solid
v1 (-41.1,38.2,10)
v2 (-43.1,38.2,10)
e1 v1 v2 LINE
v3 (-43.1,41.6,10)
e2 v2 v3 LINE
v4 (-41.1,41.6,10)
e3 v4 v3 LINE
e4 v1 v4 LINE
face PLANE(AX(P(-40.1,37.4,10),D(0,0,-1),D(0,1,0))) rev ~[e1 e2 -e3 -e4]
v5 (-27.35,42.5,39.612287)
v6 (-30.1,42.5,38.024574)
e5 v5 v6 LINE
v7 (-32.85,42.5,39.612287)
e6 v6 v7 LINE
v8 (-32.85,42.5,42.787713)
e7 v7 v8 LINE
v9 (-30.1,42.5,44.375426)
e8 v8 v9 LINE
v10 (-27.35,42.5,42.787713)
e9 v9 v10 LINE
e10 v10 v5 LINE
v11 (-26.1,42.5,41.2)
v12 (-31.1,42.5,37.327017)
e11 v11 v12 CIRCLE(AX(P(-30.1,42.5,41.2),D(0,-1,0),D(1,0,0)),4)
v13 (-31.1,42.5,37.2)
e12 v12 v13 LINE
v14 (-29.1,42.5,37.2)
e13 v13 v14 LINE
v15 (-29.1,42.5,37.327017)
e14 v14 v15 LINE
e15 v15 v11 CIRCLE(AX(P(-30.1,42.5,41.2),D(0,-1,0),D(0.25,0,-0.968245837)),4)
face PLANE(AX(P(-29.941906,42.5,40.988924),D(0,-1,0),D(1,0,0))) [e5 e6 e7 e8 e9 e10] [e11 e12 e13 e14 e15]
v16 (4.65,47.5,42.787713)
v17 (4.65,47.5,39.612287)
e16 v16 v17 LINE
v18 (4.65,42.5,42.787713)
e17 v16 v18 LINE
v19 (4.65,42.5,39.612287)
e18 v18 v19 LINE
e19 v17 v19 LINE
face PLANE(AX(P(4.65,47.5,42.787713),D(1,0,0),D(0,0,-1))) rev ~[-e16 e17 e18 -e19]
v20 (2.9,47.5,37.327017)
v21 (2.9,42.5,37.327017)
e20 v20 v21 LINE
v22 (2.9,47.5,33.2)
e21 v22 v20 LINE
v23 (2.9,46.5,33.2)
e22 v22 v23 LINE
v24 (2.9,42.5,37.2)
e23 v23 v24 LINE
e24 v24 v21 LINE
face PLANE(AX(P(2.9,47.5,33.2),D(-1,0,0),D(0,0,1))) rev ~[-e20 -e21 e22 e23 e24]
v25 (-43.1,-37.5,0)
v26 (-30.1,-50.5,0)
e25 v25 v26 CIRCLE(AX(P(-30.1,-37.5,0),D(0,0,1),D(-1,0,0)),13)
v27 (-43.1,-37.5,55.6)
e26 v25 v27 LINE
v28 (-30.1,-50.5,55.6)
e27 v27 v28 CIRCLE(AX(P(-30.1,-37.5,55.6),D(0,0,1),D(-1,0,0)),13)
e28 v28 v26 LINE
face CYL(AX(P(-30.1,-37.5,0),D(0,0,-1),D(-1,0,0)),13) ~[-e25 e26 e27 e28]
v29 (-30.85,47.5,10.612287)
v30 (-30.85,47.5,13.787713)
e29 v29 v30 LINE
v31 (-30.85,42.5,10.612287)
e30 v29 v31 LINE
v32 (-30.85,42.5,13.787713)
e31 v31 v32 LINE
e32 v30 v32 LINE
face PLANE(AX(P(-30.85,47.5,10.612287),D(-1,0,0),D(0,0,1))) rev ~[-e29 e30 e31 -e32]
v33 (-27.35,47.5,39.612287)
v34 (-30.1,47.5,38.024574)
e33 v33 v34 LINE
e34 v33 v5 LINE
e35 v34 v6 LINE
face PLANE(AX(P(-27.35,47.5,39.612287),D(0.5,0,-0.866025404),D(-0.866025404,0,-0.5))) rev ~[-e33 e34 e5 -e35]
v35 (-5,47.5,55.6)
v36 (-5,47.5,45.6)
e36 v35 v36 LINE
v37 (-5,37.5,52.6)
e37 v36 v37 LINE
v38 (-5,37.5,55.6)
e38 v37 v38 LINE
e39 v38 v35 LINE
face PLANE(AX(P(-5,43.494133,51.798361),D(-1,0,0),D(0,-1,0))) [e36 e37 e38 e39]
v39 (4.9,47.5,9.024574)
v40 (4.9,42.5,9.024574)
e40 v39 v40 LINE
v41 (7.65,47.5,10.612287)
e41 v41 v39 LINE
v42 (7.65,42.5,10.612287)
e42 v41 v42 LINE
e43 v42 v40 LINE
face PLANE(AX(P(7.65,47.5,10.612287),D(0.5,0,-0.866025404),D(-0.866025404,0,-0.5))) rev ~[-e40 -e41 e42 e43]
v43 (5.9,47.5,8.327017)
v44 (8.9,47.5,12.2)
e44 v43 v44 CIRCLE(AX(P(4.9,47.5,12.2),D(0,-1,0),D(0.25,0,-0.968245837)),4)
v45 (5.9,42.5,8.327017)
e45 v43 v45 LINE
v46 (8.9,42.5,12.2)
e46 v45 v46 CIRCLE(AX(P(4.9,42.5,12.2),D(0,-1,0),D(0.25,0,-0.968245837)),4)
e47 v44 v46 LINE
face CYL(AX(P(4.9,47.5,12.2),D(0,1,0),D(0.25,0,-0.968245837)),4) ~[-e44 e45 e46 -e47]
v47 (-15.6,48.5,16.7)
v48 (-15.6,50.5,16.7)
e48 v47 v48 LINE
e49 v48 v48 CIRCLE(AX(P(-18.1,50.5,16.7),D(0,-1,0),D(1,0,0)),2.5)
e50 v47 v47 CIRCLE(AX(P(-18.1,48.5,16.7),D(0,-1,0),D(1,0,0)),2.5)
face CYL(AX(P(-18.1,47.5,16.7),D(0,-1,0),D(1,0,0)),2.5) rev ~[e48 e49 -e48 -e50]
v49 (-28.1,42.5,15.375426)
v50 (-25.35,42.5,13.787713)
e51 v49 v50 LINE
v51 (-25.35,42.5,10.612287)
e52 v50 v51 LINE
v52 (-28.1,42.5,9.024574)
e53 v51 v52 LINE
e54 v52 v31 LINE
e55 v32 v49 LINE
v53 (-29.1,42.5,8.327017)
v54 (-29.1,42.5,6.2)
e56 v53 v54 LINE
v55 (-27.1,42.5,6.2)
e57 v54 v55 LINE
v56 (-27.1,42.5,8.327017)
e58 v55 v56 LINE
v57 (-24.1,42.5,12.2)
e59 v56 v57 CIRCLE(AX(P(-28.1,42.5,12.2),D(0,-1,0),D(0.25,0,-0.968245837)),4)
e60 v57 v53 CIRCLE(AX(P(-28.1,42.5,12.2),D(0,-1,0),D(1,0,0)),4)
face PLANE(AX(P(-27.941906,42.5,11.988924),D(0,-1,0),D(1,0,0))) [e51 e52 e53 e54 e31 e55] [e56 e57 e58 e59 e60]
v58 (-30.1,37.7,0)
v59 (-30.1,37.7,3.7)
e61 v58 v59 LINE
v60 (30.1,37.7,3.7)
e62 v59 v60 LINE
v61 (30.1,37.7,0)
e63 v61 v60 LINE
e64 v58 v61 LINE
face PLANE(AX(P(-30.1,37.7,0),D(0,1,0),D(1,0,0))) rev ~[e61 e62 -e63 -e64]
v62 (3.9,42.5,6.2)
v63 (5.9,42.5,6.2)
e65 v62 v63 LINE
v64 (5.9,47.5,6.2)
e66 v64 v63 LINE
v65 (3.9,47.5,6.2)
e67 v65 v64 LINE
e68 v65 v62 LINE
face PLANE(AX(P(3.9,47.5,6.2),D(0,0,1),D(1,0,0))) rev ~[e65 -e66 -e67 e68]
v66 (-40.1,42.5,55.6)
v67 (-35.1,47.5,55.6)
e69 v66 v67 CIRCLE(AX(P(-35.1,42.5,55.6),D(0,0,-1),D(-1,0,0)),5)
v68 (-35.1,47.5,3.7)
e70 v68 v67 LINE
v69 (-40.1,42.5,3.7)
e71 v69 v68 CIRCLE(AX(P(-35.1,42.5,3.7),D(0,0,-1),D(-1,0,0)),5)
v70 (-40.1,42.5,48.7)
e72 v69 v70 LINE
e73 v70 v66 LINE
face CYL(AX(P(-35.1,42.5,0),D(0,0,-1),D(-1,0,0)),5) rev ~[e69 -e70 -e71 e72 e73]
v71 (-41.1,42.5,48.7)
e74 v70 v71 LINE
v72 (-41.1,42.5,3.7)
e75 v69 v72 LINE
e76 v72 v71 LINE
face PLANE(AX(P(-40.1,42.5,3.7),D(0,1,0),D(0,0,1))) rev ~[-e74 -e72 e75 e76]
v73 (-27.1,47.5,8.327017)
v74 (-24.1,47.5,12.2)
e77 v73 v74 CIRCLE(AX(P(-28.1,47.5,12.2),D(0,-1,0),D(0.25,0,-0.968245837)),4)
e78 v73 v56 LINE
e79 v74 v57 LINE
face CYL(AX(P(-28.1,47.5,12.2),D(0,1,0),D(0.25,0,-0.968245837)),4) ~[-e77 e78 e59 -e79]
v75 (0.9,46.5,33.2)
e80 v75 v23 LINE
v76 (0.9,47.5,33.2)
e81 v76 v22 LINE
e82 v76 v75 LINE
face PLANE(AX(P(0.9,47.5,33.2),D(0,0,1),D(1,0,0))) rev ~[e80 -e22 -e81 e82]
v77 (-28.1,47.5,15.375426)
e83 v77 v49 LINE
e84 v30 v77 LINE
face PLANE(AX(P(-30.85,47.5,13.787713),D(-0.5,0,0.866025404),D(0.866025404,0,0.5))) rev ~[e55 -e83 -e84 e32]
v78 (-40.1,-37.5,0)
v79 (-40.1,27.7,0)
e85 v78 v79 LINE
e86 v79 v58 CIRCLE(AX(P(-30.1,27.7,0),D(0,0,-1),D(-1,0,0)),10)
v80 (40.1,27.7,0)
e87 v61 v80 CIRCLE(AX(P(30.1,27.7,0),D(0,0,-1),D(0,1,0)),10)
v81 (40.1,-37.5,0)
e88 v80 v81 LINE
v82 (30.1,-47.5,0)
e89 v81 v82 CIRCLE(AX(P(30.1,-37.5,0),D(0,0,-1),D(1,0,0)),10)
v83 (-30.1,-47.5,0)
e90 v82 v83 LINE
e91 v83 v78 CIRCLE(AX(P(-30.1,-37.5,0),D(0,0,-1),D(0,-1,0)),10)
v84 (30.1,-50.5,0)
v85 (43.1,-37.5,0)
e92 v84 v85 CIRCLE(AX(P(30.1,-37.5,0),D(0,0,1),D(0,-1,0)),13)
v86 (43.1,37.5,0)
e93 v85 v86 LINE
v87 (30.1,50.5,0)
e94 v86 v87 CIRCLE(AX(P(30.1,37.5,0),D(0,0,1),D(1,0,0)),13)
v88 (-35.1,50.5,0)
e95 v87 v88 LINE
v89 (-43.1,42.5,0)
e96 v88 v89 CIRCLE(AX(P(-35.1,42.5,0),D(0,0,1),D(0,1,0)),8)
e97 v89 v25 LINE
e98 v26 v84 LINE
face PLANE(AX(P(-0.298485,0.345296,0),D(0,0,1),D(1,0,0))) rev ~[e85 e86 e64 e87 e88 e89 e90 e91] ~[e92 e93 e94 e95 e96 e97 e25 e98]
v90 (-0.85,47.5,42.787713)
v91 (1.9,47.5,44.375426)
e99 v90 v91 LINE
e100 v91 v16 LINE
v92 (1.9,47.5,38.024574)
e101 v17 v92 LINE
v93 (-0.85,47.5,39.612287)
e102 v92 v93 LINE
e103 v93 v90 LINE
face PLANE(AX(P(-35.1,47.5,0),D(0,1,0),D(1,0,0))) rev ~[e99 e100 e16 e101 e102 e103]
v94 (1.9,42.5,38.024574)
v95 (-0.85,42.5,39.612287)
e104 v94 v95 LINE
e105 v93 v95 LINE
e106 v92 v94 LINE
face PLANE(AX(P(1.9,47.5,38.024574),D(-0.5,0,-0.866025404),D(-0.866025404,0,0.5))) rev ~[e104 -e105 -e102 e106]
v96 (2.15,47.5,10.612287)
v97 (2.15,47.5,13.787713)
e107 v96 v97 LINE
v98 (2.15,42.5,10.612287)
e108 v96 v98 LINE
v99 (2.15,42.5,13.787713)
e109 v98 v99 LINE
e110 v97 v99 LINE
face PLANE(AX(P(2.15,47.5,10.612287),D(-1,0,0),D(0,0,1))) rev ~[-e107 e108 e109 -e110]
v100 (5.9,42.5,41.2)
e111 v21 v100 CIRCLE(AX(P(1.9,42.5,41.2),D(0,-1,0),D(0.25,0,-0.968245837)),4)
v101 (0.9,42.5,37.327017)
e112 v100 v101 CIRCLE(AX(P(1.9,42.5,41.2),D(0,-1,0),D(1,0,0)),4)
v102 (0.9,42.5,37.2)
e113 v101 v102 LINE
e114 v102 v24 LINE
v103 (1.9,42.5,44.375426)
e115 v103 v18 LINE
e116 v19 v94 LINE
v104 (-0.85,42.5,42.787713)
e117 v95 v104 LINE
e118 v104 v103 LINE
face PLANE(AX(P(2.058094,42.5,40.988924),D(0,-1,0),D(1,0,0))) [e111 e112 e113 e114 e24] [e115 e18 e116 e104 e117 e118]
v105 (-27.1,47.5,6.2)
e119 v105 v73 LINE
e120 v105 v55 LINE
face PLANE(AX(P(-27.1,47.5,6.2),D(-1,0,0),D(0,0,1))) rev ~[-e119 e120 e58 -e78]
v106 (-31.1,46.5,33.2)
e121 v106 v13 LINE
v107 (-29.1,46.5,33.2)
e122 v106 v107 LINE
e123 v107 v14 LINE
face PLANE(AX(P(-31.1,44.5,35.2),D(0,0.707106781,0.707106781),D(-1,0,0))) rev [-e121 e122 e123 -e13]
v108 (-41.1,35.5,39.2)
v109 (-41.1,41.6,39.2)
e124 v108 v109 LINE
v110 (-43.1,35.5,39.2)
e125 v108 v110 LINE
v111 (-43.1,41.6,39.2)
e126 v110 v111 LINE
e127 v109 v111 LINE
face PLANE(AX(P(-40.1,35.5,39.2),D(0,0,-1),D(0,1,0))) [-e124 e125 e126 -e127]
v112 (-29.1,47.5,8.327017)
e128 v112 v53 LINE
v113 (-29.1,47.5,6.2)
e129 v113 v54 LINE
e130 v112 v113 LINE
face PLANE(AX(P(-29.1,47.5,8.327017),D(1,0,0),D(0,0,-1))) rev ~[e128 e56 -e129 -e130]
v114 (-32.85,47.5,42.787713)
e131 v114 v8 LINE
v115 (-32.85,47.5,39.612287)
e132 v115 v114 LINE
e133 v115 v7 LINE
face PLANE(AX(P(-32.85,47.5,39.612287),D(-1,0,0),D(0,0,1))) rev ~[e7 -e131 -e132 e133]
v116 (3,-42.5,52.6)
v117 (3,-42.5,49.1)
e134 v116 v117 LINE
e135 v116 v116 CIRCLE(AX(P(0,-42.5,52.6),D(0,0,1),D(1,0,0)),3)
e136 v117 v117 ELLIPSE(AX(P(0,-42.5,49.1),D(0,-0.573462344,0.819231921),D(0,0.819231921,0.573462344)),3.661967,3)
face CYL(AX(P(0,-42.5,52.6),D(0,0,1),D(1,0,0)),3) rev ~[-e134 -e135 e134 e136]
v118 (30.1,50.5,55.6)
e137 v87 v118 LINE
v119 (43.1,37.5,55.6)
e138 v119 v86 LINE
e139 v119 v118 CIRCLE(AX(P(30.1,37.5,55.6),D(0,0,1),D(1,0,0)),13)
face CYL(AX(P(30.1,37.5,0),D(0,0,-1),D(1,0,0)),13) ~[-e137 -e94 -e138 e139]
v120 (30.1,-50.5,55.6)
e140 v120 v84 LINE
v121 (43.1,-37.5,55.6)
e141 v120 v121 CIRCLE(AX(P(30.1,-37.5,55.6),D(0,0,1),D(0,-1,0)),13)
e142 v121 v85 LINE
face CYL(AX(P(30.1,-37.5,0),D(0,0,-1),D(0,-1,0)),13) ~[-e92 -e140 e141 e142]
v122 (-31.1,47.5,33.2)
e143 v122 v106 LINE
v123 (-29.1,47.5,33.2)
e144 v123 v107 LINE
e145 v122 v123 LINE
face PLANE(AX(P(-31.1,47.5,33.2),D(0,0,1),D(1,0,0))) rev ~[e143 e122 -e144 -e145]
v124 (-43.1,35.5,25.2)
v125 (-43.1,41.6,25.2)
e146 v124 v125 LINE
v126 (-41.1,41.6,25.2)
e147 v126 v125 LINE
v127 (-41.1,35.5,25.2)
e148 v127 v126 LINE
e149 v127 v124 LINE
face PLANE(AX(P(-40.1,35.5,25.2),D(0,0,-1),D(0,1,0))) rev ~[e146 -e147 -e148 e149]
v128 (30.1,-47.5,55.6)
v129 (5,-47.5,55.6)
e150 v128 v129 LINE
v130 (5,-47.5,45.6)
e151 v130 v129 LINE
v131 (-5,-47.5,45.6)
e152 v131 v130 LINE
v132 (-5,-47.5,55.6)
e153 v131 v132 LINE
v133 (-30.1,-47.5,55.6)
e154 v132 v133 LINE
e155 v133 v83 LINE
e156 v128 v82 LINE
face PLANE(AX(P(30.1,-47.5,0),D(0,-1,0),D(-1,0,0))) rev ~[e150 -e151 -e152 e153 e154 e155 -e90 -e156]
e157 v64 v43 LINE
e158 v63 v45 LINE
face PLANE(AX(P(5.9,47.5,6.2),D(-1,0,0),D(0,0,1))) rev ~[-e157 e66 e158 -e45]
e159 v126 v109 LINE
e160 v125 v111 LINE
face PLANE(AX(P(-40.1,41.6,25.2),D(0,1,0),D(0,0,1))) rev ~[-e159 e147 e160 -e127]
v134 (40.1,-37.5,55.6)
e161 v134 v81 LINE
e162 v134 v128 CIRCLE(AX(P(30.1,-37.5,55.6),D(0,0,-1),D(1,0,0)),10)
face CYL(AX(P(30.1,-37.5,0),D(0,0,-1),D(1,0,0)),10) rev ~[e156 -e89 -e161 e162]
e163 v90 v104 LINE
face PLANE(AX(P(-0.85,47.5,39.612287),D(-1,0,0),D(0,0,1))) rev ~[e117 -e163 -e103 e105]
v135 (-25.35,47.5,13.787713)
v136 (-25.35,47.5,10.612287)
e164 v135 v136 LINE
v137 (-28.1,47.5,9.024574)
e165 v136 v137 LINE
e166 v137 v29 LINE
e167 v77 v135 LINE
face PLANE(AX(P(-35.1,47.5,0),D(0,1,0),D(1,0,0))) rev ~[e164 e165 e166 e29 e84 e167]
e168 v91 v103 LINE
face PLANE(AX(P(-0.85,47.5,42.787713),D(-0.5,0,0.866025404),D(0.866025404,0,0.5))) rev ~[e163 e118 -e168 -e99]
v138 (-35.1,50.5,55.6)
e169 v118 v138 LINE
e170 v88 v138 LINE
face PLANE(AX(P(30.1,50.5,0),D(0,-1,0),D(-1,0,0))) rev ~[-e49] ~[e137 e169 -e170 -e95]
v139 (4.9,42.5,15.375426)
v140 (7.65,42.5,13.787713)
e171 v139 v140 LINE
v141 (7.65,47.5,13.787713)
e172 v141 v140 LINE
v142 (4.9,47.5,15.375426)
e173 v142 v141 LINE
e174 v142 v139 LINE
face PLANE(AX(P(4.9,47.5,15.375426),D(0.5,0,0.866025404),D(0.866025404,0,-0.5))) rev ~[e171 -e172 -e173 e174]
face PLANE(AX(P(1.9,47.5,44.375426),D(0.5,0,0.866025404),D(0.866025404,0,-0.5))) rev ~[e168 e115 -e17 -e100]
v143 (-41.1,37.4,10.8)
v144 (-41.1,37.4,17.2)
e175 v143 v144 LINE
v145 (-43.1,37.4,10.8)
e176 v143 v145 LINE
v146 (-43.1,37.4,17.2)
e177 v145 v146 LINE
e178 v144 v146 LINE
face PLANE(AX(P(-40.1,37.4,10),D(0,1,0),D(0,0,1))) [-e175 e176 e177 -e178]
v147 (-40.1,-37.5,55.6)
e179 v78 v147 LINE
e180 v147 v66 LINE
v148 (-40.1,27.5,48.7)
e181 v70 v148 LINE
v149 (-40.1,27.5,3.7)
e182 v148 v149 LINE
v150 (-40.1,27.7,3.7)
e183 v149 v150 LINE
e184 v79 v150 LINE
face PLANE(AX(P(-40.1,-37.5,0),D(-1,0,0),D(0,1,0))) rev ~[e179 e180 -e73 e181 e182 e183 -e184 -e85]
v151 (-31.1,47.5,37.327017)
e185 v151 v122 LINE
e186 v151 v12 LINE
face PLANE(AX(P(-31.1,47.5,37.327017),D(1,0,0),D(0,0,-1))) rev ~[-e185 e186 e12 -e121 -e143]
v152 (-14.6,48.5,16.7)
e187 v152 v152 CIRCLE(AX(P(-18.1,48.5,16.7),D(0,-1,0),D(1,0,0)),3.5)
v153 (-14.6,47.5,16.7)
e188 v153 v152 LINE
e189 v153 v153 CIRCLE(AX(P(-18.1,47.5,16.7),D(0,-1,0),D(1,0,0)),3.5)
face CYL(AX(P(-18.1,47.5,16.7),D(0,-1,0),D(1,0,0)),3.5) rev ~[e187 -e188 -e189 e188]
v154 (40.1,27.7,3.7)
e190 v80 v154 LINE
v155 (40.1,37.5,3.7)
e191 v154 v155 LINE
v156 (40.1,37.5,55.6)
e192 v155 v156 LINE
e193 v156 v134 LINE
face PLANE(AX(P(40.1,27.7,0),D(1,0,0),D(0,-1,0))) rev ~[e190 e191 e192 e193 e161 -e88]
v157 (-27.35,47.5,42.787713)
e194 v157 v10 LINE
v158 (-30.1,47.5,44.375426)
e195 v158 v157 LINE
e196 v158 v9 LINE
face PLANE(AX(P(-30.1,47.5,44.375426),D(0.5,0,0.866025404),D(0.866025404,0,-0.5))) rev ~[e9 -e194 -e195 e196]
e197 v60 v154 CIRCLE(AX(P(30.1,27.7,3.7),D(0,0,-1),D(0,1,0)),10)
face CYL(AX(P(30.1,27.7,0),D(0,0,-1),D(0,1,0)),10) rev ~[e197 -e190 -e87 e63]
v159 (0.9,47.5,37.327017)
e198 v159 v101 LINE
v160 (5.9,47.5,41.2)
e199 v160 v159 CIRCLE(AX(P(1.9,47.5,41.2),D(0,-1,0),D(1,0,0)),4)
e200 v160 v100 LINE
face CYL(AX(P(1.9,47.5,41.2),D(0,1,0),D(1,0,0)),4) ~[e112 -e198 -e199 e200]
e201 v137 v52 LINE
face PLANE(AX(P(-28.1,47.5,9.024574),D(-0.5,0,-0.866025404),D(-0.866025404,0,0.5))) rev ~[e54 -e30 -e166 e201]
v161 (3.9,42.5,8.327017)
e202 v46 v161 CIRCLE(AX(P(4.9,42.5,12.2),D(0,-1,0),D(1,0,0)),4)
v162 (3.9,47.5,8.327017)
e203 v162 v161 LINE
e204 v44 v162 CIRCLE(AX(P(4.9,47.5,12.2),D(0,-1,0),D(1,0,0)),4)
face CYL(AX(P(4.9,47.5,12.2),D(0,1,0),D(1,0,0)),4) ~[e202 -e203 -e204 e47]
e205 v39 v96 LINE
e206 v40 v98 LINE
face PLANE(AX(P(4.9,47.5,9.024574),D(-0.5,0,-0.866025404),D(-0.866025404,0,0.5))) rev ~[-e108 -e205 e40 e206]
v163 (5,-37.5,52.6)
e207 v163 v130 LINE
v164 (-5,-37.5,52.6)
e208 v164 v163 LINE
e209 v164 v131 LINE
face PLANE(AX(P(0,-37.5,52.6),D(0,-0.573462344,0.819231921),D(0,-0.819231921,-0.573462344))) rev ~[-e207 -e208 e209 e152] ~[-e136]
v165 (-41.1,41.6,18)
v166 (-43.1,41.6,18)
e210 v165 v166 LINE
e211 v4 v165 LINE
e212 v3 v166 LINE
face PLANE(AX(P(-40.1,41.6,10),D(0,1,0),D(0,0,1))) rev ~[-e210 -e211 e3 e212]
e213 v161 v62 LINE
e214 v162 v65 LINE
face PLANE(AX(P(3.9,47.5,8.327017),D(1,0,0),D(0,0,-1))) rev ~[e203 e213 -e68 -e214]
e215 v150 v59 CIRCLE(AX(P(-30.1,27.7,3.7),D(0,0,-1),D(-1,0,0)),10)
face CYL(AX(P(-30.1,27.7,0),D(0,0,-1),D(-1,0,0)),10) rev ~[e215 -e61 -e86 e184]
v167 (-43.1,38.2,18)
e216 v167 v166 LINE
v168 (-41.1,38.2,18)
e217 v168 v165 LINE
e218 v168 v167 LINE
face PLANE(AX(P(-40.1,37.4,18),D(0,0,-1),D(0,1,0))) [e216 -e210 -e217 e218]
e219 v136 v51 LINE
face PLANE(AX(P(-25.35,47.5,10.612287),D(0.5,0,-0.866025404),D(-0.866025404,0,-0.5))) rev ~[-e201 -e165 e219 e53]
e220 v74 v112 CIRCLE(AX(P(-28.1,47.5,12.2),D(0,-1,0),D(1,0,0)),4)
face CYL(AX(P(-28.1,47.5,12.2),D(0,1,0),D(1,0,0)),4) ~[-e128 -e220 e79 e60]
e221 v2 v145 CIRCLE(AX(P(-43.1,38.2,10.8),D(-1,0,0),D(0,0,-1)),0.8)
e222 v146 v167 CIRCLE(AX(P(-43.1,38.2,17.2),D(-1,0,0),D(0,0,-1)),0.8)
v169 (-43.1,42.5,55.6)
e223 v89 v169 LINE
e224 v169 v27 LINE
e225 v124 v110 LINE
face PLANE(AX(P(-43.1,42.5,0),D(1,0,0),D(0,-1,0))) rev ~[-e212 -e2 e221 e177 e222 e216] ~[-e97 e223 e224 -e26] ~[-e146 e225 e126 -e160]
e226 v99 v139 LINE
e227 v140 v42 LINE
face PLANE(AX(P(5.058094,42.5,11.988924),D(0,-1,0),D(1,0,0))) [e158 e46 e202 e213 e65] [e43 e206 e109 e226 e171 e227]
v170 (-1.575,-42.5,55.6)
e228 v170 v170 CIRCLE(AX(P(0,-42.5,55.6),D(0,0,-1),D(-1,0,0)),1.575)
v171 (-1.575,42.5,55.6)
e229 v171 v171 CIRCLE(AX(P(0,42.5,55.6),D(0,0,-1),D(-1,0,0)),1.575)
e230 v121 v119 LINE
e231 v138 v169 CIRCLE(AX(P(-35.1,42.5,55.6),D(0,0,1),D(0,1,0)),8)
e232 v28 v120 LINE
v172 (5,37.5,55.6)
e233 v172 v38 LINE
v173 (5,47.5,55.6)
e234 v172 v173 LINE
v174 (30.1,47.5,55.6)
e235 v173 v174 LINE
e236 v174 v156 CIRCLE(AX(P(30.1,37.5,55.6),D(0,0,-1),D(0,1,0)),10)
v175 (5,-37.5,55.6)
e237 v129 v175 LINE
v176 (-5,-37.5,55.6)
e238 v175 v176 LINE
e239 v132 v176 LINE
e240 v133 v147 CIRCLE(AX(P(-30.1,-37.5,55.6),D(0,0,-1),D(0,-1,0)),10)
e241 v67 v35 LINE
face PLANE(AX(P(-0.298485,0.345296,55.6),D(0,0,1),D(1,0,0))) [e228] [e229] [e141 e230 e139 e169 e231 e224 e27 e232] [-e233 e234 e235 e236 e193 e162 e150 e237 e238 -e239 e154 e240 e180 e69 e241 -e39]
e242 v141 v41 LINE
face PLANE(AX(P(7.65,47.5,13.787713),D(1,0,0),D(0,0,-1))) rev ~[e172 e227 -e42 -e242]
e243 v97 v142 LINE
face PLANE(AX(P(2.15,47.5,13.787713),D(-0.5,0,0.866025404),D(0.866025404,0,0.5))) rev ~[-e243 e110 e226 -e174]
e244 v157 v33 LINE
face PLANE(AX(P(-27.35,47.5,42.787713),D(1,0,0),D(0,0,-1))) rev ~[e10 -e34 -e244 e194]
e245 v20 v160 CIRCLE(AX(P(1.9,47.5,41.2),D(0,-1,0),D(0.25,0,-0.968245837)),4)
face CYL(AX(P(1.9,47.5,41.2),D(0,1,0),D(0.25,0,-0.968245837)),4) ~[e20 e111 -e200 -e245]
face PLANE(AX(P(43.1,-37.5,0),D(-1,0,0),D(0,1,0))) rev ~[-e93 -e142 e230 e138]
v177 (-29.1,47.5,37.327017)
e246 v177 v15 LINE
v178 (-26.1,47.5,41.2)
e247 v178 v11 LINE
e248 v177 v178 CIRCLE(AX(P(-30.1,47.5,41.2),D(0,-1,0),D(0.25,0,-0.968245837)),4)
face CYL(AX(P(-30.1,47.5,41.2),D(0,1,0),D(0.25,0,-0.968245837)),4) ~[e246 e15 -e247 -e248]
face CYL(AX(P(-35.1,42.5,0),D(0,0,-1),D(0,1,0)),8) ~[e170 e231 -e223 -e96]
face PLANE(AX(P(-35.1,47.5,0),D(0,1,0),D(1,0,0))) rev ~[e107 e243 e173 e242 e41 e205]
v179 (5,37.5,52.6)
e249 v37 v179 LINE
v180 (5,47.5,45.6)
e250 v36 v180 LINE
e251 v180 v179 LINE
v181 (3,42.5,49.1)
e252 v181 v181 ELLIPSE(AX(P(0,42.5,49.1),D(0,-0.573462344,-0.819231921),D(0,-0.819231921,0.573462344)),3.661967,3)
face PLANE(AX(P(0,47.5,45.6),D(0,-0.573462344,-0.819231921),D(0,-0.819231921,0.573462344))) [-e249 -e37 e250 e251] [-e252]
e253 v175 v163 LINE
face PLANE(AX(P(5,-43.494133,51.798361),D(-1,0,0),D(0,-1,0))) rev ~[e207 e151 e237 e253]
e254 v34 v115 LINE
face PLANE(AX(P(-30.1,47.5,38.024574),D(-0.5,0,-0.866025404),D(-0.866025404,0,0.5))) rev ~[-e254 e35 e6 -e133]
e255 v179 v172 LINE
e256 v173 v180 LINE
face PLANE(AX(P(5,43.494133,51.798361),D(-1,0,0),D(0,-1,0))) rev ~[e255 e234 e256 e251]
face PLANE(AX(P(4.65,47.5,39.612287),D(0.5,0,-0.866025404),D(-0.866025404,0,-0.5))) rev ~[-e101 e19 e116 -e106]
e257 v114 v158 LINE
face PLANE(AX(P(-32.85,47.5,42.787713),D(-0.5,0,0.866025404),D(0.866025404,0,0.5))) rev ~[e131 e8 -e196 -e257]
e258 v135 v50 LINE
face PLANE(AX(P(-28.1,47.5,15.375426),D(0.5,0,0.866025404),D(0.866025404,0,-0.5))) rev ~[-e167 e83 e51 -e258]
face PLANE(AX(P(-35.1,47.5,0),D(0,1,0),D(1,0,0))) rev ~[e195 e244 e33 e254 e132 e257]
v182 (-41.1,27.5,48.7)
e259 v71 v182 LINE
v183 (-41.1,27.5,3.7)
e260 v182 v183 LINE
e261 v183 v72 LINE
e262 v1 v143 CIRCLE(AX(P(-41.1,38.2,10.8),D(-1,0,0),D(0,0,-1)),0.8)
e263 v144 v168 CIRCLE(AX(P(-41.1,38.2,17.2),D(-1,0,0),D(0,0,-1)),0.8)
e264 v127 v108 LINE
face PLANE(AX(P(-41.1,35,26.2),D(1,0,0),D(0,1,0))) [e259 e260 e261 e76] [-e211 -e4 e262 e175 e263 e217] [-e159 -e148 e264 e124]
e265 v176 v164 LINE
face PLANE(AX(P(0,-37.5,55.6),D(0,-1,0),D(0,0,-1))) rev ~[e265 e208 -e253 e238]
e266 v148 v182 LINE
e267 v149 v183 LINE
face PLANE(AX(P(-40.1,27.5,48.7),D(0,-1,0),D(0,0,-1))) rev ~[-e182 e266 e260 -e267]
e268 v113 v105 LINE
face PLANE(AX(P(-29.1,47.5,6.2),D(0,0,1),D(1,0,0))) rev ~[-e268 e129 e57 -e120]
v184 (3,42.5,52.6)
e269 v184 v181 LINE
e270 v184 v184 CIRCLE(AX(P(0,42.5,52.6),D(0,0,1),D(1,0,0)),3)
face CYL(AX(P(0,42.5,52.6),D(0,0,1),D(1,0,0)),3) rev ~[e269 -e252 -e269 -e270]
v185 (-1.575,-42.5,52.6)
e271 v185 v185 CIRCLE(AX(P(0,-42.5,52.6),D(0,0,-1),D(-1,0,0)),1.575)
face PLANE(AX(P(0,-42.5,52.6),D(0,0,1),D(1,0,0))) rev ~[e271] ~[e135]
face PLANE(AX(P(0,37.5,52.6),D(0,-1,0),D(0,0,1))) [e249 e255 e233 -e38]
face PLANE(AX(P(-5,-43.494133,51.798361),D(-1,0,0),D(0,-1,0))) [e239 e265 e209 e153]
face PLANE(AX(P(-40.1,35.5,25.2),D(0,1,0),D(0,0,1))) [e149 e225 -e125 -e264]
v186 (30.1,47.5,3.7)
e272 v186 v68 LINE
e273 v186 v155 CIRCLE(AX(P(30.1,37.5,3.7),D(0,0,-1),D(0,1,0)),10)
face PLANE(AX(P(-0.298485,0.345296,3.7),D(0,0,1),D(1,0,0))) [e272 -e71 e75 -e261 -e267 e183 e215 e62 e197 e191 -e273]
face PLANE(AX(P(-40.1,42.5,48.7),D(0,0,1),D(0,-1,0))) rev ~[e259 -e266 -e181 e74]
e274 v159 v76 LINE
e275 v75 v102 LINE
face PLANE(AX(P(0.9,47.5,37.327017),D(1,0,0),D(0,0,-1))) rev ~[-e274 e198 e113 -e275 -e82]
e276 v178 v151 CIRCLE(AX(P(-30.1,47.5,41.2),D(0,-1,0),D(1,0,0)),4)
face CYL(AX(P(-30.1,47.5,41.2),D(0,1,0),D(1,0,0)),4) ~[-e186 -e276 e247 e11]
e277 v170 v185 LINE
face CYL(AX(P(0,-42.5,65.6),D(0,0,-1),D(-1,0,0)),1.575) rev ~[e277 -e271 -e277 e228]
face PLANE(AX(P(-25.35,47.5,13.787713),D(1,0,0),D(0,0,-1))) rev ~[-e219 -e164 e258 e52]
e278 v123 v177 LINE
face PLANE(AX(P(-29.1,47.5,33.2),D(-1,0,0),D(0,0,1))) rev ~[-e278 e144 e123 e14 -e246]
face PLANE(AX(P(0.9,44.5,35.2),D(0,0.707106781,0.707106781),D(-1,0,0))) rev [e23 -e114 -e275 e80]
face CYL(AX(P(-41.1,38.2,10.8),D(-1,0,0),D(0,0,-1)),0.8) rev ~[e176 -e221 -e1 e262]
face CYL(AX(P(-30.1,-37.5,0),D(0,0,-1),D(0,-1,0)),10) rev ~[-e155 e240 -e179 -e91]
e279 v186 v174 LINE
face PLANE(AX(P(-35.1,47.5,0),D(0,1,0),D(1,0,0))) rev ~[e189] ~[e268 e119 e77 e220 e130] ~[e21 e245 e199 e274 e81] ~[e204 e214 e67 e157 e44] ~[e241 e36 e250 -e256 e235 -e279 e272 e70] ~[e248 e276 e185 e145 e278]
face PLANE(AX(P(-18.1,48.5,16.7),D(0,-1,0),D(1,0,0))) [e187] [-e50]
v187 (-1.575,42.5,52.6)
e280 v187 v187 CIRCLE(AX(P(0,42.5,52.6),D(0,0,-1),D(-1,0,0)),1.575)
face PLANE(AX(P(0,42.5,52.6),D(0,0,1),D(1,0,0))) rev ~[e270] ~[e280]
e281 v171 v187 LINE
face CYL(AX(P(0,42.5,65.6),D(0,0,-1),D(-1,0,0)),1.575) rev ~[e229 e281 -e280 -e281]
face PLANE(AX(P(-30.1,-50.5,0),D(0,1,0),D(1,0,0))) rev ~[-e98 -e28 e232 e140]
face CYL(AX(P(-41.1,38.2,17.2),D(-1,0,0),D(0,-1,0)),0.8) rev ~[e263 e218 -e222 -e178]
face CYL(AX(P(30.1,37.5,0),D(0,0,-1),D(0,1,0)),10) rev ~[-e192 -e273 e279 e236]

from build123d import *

# Parameters (mm, degrees)
F1_DEPTH  = 3.7
F2_DEPTH  = 55.6
F5_DEPTH  = 5
F7_D      = 3.15
F7_DEPTH  = 10
F7_TIP    = 0.946355475
F9_R      = 3
F10_DEPTH = 10
F12_DEPTH = 5
F11_R     = 2.5
F13_DEPTH = 25
F11_R_2   = 3.5
F14_DEPTH = 1
F15_SIZE  = 4
F16_W     = 4.2
F16_H     = 8
F16_W_2   = 6.1
F16_H_2   = 14
F17_DEPTH = 1
F18_DEPTH = 3
F19_R     = 0.8


with BuildPart() as f1:
    # F0 (on Top) → F1 (new body)
    with BuildSketch(Plane.XY):
        with BuildLine():
            ThreePointArc((43.1, 37.5), (39.2923881554, 46.6923881554), (30.1, 50.5))
            Line((30.1, 50.5), (-35.1, 50.5))
            ThreePointArc((-35.1, 50.5), (-40.7568542495, 48.1568542495), (-43.1, 42.5))
            Line((-43.1, 42.5), (-43.1, -37.5))
            ThreePointArc((-43.1, -37.5), (-39.2923881554, -46.6923881554), (-30.1, -50.5))
            Line((-30.1, -50.5), (30.1, -50.5))
            ThreePointArc((30.1, -50.5), (39.2923881554, -46.6923881554), (43.1, -37.5))
            Line((43.1, -37.5), (43.1, 37.5))
        make_face()
        with BuildLine():
            Line((40.1, 37.5), (40.1, 27.7))
            Line((40.1, 27.7), (40.1, -37.5))
            ThreePointArc((40.1, -37.5), (37.1710678119, -44.5710678119), (30.1, -47.5))
            Line((30.1, -47.5), (-30.1, -47.5))
            ThreePointArc((-30.1, -47.5), (-37.1710678119, -44.5710678119), (-40.1, -37.5))
            Line((-40.1, -37.5), (-40.1, 27.7))
            Line((-40.1, 27.7), (-40.1, 42.5))
            ThreePointArc((-40.1, 42.5), (-38.6355339059, 46.0355339059), (-35.1, 47.5))
            Line((-35.1, 47.5), (30.1, 47.5))
            ThreePointArc((30.1, 47.5), (37.1710678119, 44.5710678119), (40.1, 37.5))
        make_face(mode=Mode.SUBTRACT)
        with BuildLine():
            Line((-30.1, 37.7), (30.1, 37.7))
            ThreePointArc((30.1, 37.7), (37.1710678119, 34.7710678119), (40.1, 27.7))
            Line((40.1, 27.7), (40.1, 37.5))
            ThreePointArc((40.1, 37.5), (37.1710678119, 44.5710678119), (30.1, 47.5))
            Line((30.1, 47.5), (-35.1, 47.5))
            ThreePointArc((-35.1, 47.5), (-38.6355339059, 46.0355339059), (-40.1, 42.5))
            Line((-40.1, 42.5), (-40.1, 27.7))
            ThreePointArc((-40.1, 27.7), (-37.1710678119, 34.7710678119), (-30.1, 37.7))
        make_face()
    extrude(amount=F1_DEPTH)

    # F0 (on Top) → F2 (join)
    with BuildSketch(Plane.XY):
        with BuildLine():
            ThreePointArc((43.1, 37.5), (39.2923881554, 46.6923881554), (30.1, 50.5))
            Line((30.1, 50.5), (-35.1, 50.5))
            ThreePointArc((-35.1, 50.5), (-40.7568542495, 48.1568542495), (-43.1, 42.5))
            Line((-43.1, 42.5), (-43.1, -37.5))
            ThreePointArc((-43.1, -37.5), (-39.2923881554, -46.6923881554), (-30.1, -50.5))
            Line((-30.1, -50.5), (30.1, -50.5))
            ThreePointArc((30.1, -50.5), (39.2923881554, -46.6923881554), (43.1, -37.5))
            Line((43.1, -37.5), (43.1, 37.5))
        make_face()
        with BuildLine():
            Line((40.1, 37.5), (40.1, 27.7))
            Line((40.1, 27.7), (40.1, -37.5))
            ThreePointArc((40.1, -37.5), (37.1710678119, -44.5710678119), (30.1, -47.5))
            Line((30.1, -47.5), (-30.1, -47.5))
            ThreePointArc((-30.1, -47.5), (-37.1710678119, -44.5710678119), (-40.1, -37.5))
            Line((-40.1, -37.5), (-40.1, 27.7))
            Line((-40.1, 27.7), (-40.1, 42.5))
            ThreePointArc((-40.1, 42.5), (-38.6355339059, 46.0355339059), (-35.1, 47.5))
            Line((-35.1, 47.5), (30.1, 47.5))
            ThreePointArc((30.1, 47.5), (37.1710678119, 44.5710678119), (40.1, 37.5))
        make_face(mode=Mode.SUBTRACT)
    extrude(amount=F2_DEPTH)

    # F4 (on offset) → F5 (join, symmetric)
    with BuildSketch(Plane(origin=(0, 0, 0), x_dir=(0, -1, 0), z_dir=(-1, 0, 0))):
        Polygon((47.5, 45.6), (47.5, 55.6), (37.5, 55.6), (37.5, 52.6), align=None)
        Polygon((-37.5, 52.6), (-37.5, 55.6), (-47.5, 55.6), (-47.5, 45.6), align=None)
    extrude(amount=F5_DEPTH, both=True)

    # F7
    with Locations(Plane.XY.offset(55.6)):
        with Locations((0, 42.5), (0, -42.5)):
            Hole(F7_D / 2, depth=F7_DEPTH)
            with Locations((0, 0, -(F7_DEPTH + F7_TIP / 2))):  # 118° drill point
                Cone(0, F7_D / 2, F7_TIP, mode=Mode.SUBTRACT)

    # F9 (on offset) → F10 (cut)
    with BuildSketch(Plane.XY.offset(52.6)):
        with Locations((0, 42.5)):
            Circle(F9_R)
        with Locations((0, -42.5)):
            Circle(F9_R)
    extrude(amount=-F10_DEPTH, mode=Mode.SUBTRACT)

    # F11 (on face) → F12 (join)
    with BuildSketch(Plane.XZ.offset(-47.5)):
        with BuildLine():
            ThreePointArc((-29.1, 37.3270166538), (-26.9377223398, 38.7505102572), (-26.1, 41.2))
            ThreePointArc((-26.1, 41.2), (-32.5494897428, 44.3622776602), (-31.1, 37.3270166538))
            ThreePointArc((-31.1, 37.3270166538), (-30.1, 37.2), (-29.1, 37.3270166538))
        make_face()
        Polygon((-30.1, 44.3754264805), (-27.35, 42.7877132403), (-27.35, 39.6122867597), (-30.1, 38.0245735195), (-32.85, 39.6122867597), (-32.85, 42.7877132403), align=None, mode=Mode.SUBTRACT)
        with BuildLine():
            ThreePointArc((-29.1, 37.3270166538), (-30.1, 37.2), (-31.1, 37.3270166538))
            Line((-31.1, 37.3270166538), (-31.1, 33.2))
            Line((-31.1, 33.2), (-29.1, 33.2))
            Line((-29.1, 33.2), (-29.1, 37.3270166538))
        make_face()
        with BuildLine():
            ThreePointArc((2.9, 37.3270166538), (5.0622776602, 38.7505102572), (5.9, 41.2))
            ThreePointArc((5.9, 41.2), (-0.5494897428, 44.3622776602), (0.9, 37.3270166538))
            ThreePointArc((0.9, 37.3270166538), (1.9, 37.2), (2.9, 37.3270166538))
        make_face()
        Polygon((1.9, 44.3754264805), (4.65, 42.7877132403), (4.65, 39.6122867597), (1.9, 38.0245735195), (-0.85, 39.6122867597), (-0.85, 42.7877132403), align=None, mode=Mode.SUBTRACT)
        with BuildLine():
            ThreePointArc((2.9, 37.3270166538), (1.9, 37.2), (0.9, 37.3270166538))
            Line((0.9, 37.3270166538), (0.9, 33.2))
            Line((0.9, 33.2), (2.9, 33.2))
            Line((2.9, 33.2), (2.9, 37.3270166538))
        make_face()
        with BuildLine():
            ThreePointArc((-27.1, 8.3270166538), (-24.9377223398, 9.7505102572), (-24.1, 12.2))
            ThreePointArc((-24.1, 12.2), (-30.5494897428, 15.3622776602), (-29.1, 8.3270166538))
            ThreePointArc((-29.1, 8.3270166538), (-28.1, 8.2), (-27.1, 8.3270166538))
        make_face()
        Polygon((-28.1, 15.3754264805), (-25.35, 13.7877132403), (-25.35, 10.6122867597), (-28.1, 9.0245735195), (-30.85, 10.6122867597), (-30.85, 13.7877132403), align=None, mode=Mode.SUBTRACT)
        with BuildLine():
            ThreePointArc((-27.1, 8.3270166538), (-28.1, 8.2), (-29.1, 8.3270166538))
            Line((-29.1, 8.3270166538), (-29.1, 6.2))
            Line((-29.1, 6.2), (-27.1, 6.2))
            Line((-27.1, 6.2), (-27.1, 8.3270166538))
        make_face()
        with BuildLine():
            ThreePointArc((5.9, 8.3270166538), (8.0622776602, 9.7505102572), (8.9, 12.2))
            ThreePointArc((8.9, 12.2), (2.4505102572, 15.3622776602), (3.9, 8.3270166538))
            ThreePointArc((3.9, 8.3270166538), (4.9, 8.2), (5.9, 8.3270166538))
        make_face()
        Polygon((4.9, 15.3754264805), (7.65, 13.7877132403), (7.65, 10.6122867597), (4.9, 9.0245735195), (2.15, 10.6122867597), (2.15, 13.7877132403), align=None, mode=Mode.SUBTRACT)
        with BuildLine():
            ThreePointArc((5.9, 8.3270166538), (4.9, 8.2), (3.9, 8.3270166538))
            Line((3.9, 8.3270166538), (3.9, 6.2))
            Line((3.9, 6.2), (5.9, 6.2))
            Line((5.9, 6.2), (5.9, 8.3270166538))
        make_face()
    extrude(amount=F12_DEPTH)

    # F11 (on face) → F13 (cut)
    with BuildSketch(Plane.XZ.offset(-47.5)):
        with Locations((-18.1, 16.7)):
            Circle(F11_R)
    extrude(amount=-F13_DEPTH, mode=Mode.SUBTRACT)

    # F11 (on face) → F14 (cut)
    with BuildSketch(Plane.XZ.offset(-47.5)):
        with Locations((-18.1, 16.7)):
            Circle(F11_R_2)
        with Locations((-18.1, 16.7)):
            Circle(F11_R, mode=Mode.SUBTRACT)
        with Locations((-18.1, 16.7)):
            Circle(F11_R)
    extrude(amount=-F14_DEPTH, mode=Mode.SUBTRACT)

    # F15
    f15_edges = [f1.edges().sort_by_distance(p)[0] for p in [
        (1.9, 42.5, 33.2),
        (-30.1, 42.5, 33.2),
    ]]
    chamfer(f15_edges, length=F15_SIZE)

    # F16 (on face) → F17 (cut)
    with BuildSketch(Plane.YZ.offset(-40.1)):
        Polygon((27.7, 3.7), (42.5, 3.7), (42.5, 48.7), (27.5, 48.7), (27.5, 3.7), align=None)
        with Locations((39.5, 14)):
            Rectangle(F16_W, F16_H, mode=Mode.SUBTRACT)
        with Locations((38.55, 32.2)):
            Rectangle(F16_W_2, F16_H_2, mode=Mode.SUBTRACT)
    extrude(amount=-F17_DEPTH, mode=Mode.SUBTRACT)

    # F16 (on face) → F18 (cut)
    with BuildSketch(Plane.YZ.offset(-40.1)):
        with Locations((38.55, 32.2)):
            Rectangle(F16_W_2, F16_H_2)
        with Locations((39.5, 14)):
            Rectangle(F16_W, F16_H)
    extrude(amount=-F18_DEPTH, mode=Mode.SUBTRACT)

    # F19
    f19_edges = [f1.edges().sort_by_distance(p)[0] for p in [
        (-42.1, 37.4, 18),
        (-42.1, 37.4, 10),
    ]]
    fillet(f19_edges, radius=F19_R)


solid = f1.part
